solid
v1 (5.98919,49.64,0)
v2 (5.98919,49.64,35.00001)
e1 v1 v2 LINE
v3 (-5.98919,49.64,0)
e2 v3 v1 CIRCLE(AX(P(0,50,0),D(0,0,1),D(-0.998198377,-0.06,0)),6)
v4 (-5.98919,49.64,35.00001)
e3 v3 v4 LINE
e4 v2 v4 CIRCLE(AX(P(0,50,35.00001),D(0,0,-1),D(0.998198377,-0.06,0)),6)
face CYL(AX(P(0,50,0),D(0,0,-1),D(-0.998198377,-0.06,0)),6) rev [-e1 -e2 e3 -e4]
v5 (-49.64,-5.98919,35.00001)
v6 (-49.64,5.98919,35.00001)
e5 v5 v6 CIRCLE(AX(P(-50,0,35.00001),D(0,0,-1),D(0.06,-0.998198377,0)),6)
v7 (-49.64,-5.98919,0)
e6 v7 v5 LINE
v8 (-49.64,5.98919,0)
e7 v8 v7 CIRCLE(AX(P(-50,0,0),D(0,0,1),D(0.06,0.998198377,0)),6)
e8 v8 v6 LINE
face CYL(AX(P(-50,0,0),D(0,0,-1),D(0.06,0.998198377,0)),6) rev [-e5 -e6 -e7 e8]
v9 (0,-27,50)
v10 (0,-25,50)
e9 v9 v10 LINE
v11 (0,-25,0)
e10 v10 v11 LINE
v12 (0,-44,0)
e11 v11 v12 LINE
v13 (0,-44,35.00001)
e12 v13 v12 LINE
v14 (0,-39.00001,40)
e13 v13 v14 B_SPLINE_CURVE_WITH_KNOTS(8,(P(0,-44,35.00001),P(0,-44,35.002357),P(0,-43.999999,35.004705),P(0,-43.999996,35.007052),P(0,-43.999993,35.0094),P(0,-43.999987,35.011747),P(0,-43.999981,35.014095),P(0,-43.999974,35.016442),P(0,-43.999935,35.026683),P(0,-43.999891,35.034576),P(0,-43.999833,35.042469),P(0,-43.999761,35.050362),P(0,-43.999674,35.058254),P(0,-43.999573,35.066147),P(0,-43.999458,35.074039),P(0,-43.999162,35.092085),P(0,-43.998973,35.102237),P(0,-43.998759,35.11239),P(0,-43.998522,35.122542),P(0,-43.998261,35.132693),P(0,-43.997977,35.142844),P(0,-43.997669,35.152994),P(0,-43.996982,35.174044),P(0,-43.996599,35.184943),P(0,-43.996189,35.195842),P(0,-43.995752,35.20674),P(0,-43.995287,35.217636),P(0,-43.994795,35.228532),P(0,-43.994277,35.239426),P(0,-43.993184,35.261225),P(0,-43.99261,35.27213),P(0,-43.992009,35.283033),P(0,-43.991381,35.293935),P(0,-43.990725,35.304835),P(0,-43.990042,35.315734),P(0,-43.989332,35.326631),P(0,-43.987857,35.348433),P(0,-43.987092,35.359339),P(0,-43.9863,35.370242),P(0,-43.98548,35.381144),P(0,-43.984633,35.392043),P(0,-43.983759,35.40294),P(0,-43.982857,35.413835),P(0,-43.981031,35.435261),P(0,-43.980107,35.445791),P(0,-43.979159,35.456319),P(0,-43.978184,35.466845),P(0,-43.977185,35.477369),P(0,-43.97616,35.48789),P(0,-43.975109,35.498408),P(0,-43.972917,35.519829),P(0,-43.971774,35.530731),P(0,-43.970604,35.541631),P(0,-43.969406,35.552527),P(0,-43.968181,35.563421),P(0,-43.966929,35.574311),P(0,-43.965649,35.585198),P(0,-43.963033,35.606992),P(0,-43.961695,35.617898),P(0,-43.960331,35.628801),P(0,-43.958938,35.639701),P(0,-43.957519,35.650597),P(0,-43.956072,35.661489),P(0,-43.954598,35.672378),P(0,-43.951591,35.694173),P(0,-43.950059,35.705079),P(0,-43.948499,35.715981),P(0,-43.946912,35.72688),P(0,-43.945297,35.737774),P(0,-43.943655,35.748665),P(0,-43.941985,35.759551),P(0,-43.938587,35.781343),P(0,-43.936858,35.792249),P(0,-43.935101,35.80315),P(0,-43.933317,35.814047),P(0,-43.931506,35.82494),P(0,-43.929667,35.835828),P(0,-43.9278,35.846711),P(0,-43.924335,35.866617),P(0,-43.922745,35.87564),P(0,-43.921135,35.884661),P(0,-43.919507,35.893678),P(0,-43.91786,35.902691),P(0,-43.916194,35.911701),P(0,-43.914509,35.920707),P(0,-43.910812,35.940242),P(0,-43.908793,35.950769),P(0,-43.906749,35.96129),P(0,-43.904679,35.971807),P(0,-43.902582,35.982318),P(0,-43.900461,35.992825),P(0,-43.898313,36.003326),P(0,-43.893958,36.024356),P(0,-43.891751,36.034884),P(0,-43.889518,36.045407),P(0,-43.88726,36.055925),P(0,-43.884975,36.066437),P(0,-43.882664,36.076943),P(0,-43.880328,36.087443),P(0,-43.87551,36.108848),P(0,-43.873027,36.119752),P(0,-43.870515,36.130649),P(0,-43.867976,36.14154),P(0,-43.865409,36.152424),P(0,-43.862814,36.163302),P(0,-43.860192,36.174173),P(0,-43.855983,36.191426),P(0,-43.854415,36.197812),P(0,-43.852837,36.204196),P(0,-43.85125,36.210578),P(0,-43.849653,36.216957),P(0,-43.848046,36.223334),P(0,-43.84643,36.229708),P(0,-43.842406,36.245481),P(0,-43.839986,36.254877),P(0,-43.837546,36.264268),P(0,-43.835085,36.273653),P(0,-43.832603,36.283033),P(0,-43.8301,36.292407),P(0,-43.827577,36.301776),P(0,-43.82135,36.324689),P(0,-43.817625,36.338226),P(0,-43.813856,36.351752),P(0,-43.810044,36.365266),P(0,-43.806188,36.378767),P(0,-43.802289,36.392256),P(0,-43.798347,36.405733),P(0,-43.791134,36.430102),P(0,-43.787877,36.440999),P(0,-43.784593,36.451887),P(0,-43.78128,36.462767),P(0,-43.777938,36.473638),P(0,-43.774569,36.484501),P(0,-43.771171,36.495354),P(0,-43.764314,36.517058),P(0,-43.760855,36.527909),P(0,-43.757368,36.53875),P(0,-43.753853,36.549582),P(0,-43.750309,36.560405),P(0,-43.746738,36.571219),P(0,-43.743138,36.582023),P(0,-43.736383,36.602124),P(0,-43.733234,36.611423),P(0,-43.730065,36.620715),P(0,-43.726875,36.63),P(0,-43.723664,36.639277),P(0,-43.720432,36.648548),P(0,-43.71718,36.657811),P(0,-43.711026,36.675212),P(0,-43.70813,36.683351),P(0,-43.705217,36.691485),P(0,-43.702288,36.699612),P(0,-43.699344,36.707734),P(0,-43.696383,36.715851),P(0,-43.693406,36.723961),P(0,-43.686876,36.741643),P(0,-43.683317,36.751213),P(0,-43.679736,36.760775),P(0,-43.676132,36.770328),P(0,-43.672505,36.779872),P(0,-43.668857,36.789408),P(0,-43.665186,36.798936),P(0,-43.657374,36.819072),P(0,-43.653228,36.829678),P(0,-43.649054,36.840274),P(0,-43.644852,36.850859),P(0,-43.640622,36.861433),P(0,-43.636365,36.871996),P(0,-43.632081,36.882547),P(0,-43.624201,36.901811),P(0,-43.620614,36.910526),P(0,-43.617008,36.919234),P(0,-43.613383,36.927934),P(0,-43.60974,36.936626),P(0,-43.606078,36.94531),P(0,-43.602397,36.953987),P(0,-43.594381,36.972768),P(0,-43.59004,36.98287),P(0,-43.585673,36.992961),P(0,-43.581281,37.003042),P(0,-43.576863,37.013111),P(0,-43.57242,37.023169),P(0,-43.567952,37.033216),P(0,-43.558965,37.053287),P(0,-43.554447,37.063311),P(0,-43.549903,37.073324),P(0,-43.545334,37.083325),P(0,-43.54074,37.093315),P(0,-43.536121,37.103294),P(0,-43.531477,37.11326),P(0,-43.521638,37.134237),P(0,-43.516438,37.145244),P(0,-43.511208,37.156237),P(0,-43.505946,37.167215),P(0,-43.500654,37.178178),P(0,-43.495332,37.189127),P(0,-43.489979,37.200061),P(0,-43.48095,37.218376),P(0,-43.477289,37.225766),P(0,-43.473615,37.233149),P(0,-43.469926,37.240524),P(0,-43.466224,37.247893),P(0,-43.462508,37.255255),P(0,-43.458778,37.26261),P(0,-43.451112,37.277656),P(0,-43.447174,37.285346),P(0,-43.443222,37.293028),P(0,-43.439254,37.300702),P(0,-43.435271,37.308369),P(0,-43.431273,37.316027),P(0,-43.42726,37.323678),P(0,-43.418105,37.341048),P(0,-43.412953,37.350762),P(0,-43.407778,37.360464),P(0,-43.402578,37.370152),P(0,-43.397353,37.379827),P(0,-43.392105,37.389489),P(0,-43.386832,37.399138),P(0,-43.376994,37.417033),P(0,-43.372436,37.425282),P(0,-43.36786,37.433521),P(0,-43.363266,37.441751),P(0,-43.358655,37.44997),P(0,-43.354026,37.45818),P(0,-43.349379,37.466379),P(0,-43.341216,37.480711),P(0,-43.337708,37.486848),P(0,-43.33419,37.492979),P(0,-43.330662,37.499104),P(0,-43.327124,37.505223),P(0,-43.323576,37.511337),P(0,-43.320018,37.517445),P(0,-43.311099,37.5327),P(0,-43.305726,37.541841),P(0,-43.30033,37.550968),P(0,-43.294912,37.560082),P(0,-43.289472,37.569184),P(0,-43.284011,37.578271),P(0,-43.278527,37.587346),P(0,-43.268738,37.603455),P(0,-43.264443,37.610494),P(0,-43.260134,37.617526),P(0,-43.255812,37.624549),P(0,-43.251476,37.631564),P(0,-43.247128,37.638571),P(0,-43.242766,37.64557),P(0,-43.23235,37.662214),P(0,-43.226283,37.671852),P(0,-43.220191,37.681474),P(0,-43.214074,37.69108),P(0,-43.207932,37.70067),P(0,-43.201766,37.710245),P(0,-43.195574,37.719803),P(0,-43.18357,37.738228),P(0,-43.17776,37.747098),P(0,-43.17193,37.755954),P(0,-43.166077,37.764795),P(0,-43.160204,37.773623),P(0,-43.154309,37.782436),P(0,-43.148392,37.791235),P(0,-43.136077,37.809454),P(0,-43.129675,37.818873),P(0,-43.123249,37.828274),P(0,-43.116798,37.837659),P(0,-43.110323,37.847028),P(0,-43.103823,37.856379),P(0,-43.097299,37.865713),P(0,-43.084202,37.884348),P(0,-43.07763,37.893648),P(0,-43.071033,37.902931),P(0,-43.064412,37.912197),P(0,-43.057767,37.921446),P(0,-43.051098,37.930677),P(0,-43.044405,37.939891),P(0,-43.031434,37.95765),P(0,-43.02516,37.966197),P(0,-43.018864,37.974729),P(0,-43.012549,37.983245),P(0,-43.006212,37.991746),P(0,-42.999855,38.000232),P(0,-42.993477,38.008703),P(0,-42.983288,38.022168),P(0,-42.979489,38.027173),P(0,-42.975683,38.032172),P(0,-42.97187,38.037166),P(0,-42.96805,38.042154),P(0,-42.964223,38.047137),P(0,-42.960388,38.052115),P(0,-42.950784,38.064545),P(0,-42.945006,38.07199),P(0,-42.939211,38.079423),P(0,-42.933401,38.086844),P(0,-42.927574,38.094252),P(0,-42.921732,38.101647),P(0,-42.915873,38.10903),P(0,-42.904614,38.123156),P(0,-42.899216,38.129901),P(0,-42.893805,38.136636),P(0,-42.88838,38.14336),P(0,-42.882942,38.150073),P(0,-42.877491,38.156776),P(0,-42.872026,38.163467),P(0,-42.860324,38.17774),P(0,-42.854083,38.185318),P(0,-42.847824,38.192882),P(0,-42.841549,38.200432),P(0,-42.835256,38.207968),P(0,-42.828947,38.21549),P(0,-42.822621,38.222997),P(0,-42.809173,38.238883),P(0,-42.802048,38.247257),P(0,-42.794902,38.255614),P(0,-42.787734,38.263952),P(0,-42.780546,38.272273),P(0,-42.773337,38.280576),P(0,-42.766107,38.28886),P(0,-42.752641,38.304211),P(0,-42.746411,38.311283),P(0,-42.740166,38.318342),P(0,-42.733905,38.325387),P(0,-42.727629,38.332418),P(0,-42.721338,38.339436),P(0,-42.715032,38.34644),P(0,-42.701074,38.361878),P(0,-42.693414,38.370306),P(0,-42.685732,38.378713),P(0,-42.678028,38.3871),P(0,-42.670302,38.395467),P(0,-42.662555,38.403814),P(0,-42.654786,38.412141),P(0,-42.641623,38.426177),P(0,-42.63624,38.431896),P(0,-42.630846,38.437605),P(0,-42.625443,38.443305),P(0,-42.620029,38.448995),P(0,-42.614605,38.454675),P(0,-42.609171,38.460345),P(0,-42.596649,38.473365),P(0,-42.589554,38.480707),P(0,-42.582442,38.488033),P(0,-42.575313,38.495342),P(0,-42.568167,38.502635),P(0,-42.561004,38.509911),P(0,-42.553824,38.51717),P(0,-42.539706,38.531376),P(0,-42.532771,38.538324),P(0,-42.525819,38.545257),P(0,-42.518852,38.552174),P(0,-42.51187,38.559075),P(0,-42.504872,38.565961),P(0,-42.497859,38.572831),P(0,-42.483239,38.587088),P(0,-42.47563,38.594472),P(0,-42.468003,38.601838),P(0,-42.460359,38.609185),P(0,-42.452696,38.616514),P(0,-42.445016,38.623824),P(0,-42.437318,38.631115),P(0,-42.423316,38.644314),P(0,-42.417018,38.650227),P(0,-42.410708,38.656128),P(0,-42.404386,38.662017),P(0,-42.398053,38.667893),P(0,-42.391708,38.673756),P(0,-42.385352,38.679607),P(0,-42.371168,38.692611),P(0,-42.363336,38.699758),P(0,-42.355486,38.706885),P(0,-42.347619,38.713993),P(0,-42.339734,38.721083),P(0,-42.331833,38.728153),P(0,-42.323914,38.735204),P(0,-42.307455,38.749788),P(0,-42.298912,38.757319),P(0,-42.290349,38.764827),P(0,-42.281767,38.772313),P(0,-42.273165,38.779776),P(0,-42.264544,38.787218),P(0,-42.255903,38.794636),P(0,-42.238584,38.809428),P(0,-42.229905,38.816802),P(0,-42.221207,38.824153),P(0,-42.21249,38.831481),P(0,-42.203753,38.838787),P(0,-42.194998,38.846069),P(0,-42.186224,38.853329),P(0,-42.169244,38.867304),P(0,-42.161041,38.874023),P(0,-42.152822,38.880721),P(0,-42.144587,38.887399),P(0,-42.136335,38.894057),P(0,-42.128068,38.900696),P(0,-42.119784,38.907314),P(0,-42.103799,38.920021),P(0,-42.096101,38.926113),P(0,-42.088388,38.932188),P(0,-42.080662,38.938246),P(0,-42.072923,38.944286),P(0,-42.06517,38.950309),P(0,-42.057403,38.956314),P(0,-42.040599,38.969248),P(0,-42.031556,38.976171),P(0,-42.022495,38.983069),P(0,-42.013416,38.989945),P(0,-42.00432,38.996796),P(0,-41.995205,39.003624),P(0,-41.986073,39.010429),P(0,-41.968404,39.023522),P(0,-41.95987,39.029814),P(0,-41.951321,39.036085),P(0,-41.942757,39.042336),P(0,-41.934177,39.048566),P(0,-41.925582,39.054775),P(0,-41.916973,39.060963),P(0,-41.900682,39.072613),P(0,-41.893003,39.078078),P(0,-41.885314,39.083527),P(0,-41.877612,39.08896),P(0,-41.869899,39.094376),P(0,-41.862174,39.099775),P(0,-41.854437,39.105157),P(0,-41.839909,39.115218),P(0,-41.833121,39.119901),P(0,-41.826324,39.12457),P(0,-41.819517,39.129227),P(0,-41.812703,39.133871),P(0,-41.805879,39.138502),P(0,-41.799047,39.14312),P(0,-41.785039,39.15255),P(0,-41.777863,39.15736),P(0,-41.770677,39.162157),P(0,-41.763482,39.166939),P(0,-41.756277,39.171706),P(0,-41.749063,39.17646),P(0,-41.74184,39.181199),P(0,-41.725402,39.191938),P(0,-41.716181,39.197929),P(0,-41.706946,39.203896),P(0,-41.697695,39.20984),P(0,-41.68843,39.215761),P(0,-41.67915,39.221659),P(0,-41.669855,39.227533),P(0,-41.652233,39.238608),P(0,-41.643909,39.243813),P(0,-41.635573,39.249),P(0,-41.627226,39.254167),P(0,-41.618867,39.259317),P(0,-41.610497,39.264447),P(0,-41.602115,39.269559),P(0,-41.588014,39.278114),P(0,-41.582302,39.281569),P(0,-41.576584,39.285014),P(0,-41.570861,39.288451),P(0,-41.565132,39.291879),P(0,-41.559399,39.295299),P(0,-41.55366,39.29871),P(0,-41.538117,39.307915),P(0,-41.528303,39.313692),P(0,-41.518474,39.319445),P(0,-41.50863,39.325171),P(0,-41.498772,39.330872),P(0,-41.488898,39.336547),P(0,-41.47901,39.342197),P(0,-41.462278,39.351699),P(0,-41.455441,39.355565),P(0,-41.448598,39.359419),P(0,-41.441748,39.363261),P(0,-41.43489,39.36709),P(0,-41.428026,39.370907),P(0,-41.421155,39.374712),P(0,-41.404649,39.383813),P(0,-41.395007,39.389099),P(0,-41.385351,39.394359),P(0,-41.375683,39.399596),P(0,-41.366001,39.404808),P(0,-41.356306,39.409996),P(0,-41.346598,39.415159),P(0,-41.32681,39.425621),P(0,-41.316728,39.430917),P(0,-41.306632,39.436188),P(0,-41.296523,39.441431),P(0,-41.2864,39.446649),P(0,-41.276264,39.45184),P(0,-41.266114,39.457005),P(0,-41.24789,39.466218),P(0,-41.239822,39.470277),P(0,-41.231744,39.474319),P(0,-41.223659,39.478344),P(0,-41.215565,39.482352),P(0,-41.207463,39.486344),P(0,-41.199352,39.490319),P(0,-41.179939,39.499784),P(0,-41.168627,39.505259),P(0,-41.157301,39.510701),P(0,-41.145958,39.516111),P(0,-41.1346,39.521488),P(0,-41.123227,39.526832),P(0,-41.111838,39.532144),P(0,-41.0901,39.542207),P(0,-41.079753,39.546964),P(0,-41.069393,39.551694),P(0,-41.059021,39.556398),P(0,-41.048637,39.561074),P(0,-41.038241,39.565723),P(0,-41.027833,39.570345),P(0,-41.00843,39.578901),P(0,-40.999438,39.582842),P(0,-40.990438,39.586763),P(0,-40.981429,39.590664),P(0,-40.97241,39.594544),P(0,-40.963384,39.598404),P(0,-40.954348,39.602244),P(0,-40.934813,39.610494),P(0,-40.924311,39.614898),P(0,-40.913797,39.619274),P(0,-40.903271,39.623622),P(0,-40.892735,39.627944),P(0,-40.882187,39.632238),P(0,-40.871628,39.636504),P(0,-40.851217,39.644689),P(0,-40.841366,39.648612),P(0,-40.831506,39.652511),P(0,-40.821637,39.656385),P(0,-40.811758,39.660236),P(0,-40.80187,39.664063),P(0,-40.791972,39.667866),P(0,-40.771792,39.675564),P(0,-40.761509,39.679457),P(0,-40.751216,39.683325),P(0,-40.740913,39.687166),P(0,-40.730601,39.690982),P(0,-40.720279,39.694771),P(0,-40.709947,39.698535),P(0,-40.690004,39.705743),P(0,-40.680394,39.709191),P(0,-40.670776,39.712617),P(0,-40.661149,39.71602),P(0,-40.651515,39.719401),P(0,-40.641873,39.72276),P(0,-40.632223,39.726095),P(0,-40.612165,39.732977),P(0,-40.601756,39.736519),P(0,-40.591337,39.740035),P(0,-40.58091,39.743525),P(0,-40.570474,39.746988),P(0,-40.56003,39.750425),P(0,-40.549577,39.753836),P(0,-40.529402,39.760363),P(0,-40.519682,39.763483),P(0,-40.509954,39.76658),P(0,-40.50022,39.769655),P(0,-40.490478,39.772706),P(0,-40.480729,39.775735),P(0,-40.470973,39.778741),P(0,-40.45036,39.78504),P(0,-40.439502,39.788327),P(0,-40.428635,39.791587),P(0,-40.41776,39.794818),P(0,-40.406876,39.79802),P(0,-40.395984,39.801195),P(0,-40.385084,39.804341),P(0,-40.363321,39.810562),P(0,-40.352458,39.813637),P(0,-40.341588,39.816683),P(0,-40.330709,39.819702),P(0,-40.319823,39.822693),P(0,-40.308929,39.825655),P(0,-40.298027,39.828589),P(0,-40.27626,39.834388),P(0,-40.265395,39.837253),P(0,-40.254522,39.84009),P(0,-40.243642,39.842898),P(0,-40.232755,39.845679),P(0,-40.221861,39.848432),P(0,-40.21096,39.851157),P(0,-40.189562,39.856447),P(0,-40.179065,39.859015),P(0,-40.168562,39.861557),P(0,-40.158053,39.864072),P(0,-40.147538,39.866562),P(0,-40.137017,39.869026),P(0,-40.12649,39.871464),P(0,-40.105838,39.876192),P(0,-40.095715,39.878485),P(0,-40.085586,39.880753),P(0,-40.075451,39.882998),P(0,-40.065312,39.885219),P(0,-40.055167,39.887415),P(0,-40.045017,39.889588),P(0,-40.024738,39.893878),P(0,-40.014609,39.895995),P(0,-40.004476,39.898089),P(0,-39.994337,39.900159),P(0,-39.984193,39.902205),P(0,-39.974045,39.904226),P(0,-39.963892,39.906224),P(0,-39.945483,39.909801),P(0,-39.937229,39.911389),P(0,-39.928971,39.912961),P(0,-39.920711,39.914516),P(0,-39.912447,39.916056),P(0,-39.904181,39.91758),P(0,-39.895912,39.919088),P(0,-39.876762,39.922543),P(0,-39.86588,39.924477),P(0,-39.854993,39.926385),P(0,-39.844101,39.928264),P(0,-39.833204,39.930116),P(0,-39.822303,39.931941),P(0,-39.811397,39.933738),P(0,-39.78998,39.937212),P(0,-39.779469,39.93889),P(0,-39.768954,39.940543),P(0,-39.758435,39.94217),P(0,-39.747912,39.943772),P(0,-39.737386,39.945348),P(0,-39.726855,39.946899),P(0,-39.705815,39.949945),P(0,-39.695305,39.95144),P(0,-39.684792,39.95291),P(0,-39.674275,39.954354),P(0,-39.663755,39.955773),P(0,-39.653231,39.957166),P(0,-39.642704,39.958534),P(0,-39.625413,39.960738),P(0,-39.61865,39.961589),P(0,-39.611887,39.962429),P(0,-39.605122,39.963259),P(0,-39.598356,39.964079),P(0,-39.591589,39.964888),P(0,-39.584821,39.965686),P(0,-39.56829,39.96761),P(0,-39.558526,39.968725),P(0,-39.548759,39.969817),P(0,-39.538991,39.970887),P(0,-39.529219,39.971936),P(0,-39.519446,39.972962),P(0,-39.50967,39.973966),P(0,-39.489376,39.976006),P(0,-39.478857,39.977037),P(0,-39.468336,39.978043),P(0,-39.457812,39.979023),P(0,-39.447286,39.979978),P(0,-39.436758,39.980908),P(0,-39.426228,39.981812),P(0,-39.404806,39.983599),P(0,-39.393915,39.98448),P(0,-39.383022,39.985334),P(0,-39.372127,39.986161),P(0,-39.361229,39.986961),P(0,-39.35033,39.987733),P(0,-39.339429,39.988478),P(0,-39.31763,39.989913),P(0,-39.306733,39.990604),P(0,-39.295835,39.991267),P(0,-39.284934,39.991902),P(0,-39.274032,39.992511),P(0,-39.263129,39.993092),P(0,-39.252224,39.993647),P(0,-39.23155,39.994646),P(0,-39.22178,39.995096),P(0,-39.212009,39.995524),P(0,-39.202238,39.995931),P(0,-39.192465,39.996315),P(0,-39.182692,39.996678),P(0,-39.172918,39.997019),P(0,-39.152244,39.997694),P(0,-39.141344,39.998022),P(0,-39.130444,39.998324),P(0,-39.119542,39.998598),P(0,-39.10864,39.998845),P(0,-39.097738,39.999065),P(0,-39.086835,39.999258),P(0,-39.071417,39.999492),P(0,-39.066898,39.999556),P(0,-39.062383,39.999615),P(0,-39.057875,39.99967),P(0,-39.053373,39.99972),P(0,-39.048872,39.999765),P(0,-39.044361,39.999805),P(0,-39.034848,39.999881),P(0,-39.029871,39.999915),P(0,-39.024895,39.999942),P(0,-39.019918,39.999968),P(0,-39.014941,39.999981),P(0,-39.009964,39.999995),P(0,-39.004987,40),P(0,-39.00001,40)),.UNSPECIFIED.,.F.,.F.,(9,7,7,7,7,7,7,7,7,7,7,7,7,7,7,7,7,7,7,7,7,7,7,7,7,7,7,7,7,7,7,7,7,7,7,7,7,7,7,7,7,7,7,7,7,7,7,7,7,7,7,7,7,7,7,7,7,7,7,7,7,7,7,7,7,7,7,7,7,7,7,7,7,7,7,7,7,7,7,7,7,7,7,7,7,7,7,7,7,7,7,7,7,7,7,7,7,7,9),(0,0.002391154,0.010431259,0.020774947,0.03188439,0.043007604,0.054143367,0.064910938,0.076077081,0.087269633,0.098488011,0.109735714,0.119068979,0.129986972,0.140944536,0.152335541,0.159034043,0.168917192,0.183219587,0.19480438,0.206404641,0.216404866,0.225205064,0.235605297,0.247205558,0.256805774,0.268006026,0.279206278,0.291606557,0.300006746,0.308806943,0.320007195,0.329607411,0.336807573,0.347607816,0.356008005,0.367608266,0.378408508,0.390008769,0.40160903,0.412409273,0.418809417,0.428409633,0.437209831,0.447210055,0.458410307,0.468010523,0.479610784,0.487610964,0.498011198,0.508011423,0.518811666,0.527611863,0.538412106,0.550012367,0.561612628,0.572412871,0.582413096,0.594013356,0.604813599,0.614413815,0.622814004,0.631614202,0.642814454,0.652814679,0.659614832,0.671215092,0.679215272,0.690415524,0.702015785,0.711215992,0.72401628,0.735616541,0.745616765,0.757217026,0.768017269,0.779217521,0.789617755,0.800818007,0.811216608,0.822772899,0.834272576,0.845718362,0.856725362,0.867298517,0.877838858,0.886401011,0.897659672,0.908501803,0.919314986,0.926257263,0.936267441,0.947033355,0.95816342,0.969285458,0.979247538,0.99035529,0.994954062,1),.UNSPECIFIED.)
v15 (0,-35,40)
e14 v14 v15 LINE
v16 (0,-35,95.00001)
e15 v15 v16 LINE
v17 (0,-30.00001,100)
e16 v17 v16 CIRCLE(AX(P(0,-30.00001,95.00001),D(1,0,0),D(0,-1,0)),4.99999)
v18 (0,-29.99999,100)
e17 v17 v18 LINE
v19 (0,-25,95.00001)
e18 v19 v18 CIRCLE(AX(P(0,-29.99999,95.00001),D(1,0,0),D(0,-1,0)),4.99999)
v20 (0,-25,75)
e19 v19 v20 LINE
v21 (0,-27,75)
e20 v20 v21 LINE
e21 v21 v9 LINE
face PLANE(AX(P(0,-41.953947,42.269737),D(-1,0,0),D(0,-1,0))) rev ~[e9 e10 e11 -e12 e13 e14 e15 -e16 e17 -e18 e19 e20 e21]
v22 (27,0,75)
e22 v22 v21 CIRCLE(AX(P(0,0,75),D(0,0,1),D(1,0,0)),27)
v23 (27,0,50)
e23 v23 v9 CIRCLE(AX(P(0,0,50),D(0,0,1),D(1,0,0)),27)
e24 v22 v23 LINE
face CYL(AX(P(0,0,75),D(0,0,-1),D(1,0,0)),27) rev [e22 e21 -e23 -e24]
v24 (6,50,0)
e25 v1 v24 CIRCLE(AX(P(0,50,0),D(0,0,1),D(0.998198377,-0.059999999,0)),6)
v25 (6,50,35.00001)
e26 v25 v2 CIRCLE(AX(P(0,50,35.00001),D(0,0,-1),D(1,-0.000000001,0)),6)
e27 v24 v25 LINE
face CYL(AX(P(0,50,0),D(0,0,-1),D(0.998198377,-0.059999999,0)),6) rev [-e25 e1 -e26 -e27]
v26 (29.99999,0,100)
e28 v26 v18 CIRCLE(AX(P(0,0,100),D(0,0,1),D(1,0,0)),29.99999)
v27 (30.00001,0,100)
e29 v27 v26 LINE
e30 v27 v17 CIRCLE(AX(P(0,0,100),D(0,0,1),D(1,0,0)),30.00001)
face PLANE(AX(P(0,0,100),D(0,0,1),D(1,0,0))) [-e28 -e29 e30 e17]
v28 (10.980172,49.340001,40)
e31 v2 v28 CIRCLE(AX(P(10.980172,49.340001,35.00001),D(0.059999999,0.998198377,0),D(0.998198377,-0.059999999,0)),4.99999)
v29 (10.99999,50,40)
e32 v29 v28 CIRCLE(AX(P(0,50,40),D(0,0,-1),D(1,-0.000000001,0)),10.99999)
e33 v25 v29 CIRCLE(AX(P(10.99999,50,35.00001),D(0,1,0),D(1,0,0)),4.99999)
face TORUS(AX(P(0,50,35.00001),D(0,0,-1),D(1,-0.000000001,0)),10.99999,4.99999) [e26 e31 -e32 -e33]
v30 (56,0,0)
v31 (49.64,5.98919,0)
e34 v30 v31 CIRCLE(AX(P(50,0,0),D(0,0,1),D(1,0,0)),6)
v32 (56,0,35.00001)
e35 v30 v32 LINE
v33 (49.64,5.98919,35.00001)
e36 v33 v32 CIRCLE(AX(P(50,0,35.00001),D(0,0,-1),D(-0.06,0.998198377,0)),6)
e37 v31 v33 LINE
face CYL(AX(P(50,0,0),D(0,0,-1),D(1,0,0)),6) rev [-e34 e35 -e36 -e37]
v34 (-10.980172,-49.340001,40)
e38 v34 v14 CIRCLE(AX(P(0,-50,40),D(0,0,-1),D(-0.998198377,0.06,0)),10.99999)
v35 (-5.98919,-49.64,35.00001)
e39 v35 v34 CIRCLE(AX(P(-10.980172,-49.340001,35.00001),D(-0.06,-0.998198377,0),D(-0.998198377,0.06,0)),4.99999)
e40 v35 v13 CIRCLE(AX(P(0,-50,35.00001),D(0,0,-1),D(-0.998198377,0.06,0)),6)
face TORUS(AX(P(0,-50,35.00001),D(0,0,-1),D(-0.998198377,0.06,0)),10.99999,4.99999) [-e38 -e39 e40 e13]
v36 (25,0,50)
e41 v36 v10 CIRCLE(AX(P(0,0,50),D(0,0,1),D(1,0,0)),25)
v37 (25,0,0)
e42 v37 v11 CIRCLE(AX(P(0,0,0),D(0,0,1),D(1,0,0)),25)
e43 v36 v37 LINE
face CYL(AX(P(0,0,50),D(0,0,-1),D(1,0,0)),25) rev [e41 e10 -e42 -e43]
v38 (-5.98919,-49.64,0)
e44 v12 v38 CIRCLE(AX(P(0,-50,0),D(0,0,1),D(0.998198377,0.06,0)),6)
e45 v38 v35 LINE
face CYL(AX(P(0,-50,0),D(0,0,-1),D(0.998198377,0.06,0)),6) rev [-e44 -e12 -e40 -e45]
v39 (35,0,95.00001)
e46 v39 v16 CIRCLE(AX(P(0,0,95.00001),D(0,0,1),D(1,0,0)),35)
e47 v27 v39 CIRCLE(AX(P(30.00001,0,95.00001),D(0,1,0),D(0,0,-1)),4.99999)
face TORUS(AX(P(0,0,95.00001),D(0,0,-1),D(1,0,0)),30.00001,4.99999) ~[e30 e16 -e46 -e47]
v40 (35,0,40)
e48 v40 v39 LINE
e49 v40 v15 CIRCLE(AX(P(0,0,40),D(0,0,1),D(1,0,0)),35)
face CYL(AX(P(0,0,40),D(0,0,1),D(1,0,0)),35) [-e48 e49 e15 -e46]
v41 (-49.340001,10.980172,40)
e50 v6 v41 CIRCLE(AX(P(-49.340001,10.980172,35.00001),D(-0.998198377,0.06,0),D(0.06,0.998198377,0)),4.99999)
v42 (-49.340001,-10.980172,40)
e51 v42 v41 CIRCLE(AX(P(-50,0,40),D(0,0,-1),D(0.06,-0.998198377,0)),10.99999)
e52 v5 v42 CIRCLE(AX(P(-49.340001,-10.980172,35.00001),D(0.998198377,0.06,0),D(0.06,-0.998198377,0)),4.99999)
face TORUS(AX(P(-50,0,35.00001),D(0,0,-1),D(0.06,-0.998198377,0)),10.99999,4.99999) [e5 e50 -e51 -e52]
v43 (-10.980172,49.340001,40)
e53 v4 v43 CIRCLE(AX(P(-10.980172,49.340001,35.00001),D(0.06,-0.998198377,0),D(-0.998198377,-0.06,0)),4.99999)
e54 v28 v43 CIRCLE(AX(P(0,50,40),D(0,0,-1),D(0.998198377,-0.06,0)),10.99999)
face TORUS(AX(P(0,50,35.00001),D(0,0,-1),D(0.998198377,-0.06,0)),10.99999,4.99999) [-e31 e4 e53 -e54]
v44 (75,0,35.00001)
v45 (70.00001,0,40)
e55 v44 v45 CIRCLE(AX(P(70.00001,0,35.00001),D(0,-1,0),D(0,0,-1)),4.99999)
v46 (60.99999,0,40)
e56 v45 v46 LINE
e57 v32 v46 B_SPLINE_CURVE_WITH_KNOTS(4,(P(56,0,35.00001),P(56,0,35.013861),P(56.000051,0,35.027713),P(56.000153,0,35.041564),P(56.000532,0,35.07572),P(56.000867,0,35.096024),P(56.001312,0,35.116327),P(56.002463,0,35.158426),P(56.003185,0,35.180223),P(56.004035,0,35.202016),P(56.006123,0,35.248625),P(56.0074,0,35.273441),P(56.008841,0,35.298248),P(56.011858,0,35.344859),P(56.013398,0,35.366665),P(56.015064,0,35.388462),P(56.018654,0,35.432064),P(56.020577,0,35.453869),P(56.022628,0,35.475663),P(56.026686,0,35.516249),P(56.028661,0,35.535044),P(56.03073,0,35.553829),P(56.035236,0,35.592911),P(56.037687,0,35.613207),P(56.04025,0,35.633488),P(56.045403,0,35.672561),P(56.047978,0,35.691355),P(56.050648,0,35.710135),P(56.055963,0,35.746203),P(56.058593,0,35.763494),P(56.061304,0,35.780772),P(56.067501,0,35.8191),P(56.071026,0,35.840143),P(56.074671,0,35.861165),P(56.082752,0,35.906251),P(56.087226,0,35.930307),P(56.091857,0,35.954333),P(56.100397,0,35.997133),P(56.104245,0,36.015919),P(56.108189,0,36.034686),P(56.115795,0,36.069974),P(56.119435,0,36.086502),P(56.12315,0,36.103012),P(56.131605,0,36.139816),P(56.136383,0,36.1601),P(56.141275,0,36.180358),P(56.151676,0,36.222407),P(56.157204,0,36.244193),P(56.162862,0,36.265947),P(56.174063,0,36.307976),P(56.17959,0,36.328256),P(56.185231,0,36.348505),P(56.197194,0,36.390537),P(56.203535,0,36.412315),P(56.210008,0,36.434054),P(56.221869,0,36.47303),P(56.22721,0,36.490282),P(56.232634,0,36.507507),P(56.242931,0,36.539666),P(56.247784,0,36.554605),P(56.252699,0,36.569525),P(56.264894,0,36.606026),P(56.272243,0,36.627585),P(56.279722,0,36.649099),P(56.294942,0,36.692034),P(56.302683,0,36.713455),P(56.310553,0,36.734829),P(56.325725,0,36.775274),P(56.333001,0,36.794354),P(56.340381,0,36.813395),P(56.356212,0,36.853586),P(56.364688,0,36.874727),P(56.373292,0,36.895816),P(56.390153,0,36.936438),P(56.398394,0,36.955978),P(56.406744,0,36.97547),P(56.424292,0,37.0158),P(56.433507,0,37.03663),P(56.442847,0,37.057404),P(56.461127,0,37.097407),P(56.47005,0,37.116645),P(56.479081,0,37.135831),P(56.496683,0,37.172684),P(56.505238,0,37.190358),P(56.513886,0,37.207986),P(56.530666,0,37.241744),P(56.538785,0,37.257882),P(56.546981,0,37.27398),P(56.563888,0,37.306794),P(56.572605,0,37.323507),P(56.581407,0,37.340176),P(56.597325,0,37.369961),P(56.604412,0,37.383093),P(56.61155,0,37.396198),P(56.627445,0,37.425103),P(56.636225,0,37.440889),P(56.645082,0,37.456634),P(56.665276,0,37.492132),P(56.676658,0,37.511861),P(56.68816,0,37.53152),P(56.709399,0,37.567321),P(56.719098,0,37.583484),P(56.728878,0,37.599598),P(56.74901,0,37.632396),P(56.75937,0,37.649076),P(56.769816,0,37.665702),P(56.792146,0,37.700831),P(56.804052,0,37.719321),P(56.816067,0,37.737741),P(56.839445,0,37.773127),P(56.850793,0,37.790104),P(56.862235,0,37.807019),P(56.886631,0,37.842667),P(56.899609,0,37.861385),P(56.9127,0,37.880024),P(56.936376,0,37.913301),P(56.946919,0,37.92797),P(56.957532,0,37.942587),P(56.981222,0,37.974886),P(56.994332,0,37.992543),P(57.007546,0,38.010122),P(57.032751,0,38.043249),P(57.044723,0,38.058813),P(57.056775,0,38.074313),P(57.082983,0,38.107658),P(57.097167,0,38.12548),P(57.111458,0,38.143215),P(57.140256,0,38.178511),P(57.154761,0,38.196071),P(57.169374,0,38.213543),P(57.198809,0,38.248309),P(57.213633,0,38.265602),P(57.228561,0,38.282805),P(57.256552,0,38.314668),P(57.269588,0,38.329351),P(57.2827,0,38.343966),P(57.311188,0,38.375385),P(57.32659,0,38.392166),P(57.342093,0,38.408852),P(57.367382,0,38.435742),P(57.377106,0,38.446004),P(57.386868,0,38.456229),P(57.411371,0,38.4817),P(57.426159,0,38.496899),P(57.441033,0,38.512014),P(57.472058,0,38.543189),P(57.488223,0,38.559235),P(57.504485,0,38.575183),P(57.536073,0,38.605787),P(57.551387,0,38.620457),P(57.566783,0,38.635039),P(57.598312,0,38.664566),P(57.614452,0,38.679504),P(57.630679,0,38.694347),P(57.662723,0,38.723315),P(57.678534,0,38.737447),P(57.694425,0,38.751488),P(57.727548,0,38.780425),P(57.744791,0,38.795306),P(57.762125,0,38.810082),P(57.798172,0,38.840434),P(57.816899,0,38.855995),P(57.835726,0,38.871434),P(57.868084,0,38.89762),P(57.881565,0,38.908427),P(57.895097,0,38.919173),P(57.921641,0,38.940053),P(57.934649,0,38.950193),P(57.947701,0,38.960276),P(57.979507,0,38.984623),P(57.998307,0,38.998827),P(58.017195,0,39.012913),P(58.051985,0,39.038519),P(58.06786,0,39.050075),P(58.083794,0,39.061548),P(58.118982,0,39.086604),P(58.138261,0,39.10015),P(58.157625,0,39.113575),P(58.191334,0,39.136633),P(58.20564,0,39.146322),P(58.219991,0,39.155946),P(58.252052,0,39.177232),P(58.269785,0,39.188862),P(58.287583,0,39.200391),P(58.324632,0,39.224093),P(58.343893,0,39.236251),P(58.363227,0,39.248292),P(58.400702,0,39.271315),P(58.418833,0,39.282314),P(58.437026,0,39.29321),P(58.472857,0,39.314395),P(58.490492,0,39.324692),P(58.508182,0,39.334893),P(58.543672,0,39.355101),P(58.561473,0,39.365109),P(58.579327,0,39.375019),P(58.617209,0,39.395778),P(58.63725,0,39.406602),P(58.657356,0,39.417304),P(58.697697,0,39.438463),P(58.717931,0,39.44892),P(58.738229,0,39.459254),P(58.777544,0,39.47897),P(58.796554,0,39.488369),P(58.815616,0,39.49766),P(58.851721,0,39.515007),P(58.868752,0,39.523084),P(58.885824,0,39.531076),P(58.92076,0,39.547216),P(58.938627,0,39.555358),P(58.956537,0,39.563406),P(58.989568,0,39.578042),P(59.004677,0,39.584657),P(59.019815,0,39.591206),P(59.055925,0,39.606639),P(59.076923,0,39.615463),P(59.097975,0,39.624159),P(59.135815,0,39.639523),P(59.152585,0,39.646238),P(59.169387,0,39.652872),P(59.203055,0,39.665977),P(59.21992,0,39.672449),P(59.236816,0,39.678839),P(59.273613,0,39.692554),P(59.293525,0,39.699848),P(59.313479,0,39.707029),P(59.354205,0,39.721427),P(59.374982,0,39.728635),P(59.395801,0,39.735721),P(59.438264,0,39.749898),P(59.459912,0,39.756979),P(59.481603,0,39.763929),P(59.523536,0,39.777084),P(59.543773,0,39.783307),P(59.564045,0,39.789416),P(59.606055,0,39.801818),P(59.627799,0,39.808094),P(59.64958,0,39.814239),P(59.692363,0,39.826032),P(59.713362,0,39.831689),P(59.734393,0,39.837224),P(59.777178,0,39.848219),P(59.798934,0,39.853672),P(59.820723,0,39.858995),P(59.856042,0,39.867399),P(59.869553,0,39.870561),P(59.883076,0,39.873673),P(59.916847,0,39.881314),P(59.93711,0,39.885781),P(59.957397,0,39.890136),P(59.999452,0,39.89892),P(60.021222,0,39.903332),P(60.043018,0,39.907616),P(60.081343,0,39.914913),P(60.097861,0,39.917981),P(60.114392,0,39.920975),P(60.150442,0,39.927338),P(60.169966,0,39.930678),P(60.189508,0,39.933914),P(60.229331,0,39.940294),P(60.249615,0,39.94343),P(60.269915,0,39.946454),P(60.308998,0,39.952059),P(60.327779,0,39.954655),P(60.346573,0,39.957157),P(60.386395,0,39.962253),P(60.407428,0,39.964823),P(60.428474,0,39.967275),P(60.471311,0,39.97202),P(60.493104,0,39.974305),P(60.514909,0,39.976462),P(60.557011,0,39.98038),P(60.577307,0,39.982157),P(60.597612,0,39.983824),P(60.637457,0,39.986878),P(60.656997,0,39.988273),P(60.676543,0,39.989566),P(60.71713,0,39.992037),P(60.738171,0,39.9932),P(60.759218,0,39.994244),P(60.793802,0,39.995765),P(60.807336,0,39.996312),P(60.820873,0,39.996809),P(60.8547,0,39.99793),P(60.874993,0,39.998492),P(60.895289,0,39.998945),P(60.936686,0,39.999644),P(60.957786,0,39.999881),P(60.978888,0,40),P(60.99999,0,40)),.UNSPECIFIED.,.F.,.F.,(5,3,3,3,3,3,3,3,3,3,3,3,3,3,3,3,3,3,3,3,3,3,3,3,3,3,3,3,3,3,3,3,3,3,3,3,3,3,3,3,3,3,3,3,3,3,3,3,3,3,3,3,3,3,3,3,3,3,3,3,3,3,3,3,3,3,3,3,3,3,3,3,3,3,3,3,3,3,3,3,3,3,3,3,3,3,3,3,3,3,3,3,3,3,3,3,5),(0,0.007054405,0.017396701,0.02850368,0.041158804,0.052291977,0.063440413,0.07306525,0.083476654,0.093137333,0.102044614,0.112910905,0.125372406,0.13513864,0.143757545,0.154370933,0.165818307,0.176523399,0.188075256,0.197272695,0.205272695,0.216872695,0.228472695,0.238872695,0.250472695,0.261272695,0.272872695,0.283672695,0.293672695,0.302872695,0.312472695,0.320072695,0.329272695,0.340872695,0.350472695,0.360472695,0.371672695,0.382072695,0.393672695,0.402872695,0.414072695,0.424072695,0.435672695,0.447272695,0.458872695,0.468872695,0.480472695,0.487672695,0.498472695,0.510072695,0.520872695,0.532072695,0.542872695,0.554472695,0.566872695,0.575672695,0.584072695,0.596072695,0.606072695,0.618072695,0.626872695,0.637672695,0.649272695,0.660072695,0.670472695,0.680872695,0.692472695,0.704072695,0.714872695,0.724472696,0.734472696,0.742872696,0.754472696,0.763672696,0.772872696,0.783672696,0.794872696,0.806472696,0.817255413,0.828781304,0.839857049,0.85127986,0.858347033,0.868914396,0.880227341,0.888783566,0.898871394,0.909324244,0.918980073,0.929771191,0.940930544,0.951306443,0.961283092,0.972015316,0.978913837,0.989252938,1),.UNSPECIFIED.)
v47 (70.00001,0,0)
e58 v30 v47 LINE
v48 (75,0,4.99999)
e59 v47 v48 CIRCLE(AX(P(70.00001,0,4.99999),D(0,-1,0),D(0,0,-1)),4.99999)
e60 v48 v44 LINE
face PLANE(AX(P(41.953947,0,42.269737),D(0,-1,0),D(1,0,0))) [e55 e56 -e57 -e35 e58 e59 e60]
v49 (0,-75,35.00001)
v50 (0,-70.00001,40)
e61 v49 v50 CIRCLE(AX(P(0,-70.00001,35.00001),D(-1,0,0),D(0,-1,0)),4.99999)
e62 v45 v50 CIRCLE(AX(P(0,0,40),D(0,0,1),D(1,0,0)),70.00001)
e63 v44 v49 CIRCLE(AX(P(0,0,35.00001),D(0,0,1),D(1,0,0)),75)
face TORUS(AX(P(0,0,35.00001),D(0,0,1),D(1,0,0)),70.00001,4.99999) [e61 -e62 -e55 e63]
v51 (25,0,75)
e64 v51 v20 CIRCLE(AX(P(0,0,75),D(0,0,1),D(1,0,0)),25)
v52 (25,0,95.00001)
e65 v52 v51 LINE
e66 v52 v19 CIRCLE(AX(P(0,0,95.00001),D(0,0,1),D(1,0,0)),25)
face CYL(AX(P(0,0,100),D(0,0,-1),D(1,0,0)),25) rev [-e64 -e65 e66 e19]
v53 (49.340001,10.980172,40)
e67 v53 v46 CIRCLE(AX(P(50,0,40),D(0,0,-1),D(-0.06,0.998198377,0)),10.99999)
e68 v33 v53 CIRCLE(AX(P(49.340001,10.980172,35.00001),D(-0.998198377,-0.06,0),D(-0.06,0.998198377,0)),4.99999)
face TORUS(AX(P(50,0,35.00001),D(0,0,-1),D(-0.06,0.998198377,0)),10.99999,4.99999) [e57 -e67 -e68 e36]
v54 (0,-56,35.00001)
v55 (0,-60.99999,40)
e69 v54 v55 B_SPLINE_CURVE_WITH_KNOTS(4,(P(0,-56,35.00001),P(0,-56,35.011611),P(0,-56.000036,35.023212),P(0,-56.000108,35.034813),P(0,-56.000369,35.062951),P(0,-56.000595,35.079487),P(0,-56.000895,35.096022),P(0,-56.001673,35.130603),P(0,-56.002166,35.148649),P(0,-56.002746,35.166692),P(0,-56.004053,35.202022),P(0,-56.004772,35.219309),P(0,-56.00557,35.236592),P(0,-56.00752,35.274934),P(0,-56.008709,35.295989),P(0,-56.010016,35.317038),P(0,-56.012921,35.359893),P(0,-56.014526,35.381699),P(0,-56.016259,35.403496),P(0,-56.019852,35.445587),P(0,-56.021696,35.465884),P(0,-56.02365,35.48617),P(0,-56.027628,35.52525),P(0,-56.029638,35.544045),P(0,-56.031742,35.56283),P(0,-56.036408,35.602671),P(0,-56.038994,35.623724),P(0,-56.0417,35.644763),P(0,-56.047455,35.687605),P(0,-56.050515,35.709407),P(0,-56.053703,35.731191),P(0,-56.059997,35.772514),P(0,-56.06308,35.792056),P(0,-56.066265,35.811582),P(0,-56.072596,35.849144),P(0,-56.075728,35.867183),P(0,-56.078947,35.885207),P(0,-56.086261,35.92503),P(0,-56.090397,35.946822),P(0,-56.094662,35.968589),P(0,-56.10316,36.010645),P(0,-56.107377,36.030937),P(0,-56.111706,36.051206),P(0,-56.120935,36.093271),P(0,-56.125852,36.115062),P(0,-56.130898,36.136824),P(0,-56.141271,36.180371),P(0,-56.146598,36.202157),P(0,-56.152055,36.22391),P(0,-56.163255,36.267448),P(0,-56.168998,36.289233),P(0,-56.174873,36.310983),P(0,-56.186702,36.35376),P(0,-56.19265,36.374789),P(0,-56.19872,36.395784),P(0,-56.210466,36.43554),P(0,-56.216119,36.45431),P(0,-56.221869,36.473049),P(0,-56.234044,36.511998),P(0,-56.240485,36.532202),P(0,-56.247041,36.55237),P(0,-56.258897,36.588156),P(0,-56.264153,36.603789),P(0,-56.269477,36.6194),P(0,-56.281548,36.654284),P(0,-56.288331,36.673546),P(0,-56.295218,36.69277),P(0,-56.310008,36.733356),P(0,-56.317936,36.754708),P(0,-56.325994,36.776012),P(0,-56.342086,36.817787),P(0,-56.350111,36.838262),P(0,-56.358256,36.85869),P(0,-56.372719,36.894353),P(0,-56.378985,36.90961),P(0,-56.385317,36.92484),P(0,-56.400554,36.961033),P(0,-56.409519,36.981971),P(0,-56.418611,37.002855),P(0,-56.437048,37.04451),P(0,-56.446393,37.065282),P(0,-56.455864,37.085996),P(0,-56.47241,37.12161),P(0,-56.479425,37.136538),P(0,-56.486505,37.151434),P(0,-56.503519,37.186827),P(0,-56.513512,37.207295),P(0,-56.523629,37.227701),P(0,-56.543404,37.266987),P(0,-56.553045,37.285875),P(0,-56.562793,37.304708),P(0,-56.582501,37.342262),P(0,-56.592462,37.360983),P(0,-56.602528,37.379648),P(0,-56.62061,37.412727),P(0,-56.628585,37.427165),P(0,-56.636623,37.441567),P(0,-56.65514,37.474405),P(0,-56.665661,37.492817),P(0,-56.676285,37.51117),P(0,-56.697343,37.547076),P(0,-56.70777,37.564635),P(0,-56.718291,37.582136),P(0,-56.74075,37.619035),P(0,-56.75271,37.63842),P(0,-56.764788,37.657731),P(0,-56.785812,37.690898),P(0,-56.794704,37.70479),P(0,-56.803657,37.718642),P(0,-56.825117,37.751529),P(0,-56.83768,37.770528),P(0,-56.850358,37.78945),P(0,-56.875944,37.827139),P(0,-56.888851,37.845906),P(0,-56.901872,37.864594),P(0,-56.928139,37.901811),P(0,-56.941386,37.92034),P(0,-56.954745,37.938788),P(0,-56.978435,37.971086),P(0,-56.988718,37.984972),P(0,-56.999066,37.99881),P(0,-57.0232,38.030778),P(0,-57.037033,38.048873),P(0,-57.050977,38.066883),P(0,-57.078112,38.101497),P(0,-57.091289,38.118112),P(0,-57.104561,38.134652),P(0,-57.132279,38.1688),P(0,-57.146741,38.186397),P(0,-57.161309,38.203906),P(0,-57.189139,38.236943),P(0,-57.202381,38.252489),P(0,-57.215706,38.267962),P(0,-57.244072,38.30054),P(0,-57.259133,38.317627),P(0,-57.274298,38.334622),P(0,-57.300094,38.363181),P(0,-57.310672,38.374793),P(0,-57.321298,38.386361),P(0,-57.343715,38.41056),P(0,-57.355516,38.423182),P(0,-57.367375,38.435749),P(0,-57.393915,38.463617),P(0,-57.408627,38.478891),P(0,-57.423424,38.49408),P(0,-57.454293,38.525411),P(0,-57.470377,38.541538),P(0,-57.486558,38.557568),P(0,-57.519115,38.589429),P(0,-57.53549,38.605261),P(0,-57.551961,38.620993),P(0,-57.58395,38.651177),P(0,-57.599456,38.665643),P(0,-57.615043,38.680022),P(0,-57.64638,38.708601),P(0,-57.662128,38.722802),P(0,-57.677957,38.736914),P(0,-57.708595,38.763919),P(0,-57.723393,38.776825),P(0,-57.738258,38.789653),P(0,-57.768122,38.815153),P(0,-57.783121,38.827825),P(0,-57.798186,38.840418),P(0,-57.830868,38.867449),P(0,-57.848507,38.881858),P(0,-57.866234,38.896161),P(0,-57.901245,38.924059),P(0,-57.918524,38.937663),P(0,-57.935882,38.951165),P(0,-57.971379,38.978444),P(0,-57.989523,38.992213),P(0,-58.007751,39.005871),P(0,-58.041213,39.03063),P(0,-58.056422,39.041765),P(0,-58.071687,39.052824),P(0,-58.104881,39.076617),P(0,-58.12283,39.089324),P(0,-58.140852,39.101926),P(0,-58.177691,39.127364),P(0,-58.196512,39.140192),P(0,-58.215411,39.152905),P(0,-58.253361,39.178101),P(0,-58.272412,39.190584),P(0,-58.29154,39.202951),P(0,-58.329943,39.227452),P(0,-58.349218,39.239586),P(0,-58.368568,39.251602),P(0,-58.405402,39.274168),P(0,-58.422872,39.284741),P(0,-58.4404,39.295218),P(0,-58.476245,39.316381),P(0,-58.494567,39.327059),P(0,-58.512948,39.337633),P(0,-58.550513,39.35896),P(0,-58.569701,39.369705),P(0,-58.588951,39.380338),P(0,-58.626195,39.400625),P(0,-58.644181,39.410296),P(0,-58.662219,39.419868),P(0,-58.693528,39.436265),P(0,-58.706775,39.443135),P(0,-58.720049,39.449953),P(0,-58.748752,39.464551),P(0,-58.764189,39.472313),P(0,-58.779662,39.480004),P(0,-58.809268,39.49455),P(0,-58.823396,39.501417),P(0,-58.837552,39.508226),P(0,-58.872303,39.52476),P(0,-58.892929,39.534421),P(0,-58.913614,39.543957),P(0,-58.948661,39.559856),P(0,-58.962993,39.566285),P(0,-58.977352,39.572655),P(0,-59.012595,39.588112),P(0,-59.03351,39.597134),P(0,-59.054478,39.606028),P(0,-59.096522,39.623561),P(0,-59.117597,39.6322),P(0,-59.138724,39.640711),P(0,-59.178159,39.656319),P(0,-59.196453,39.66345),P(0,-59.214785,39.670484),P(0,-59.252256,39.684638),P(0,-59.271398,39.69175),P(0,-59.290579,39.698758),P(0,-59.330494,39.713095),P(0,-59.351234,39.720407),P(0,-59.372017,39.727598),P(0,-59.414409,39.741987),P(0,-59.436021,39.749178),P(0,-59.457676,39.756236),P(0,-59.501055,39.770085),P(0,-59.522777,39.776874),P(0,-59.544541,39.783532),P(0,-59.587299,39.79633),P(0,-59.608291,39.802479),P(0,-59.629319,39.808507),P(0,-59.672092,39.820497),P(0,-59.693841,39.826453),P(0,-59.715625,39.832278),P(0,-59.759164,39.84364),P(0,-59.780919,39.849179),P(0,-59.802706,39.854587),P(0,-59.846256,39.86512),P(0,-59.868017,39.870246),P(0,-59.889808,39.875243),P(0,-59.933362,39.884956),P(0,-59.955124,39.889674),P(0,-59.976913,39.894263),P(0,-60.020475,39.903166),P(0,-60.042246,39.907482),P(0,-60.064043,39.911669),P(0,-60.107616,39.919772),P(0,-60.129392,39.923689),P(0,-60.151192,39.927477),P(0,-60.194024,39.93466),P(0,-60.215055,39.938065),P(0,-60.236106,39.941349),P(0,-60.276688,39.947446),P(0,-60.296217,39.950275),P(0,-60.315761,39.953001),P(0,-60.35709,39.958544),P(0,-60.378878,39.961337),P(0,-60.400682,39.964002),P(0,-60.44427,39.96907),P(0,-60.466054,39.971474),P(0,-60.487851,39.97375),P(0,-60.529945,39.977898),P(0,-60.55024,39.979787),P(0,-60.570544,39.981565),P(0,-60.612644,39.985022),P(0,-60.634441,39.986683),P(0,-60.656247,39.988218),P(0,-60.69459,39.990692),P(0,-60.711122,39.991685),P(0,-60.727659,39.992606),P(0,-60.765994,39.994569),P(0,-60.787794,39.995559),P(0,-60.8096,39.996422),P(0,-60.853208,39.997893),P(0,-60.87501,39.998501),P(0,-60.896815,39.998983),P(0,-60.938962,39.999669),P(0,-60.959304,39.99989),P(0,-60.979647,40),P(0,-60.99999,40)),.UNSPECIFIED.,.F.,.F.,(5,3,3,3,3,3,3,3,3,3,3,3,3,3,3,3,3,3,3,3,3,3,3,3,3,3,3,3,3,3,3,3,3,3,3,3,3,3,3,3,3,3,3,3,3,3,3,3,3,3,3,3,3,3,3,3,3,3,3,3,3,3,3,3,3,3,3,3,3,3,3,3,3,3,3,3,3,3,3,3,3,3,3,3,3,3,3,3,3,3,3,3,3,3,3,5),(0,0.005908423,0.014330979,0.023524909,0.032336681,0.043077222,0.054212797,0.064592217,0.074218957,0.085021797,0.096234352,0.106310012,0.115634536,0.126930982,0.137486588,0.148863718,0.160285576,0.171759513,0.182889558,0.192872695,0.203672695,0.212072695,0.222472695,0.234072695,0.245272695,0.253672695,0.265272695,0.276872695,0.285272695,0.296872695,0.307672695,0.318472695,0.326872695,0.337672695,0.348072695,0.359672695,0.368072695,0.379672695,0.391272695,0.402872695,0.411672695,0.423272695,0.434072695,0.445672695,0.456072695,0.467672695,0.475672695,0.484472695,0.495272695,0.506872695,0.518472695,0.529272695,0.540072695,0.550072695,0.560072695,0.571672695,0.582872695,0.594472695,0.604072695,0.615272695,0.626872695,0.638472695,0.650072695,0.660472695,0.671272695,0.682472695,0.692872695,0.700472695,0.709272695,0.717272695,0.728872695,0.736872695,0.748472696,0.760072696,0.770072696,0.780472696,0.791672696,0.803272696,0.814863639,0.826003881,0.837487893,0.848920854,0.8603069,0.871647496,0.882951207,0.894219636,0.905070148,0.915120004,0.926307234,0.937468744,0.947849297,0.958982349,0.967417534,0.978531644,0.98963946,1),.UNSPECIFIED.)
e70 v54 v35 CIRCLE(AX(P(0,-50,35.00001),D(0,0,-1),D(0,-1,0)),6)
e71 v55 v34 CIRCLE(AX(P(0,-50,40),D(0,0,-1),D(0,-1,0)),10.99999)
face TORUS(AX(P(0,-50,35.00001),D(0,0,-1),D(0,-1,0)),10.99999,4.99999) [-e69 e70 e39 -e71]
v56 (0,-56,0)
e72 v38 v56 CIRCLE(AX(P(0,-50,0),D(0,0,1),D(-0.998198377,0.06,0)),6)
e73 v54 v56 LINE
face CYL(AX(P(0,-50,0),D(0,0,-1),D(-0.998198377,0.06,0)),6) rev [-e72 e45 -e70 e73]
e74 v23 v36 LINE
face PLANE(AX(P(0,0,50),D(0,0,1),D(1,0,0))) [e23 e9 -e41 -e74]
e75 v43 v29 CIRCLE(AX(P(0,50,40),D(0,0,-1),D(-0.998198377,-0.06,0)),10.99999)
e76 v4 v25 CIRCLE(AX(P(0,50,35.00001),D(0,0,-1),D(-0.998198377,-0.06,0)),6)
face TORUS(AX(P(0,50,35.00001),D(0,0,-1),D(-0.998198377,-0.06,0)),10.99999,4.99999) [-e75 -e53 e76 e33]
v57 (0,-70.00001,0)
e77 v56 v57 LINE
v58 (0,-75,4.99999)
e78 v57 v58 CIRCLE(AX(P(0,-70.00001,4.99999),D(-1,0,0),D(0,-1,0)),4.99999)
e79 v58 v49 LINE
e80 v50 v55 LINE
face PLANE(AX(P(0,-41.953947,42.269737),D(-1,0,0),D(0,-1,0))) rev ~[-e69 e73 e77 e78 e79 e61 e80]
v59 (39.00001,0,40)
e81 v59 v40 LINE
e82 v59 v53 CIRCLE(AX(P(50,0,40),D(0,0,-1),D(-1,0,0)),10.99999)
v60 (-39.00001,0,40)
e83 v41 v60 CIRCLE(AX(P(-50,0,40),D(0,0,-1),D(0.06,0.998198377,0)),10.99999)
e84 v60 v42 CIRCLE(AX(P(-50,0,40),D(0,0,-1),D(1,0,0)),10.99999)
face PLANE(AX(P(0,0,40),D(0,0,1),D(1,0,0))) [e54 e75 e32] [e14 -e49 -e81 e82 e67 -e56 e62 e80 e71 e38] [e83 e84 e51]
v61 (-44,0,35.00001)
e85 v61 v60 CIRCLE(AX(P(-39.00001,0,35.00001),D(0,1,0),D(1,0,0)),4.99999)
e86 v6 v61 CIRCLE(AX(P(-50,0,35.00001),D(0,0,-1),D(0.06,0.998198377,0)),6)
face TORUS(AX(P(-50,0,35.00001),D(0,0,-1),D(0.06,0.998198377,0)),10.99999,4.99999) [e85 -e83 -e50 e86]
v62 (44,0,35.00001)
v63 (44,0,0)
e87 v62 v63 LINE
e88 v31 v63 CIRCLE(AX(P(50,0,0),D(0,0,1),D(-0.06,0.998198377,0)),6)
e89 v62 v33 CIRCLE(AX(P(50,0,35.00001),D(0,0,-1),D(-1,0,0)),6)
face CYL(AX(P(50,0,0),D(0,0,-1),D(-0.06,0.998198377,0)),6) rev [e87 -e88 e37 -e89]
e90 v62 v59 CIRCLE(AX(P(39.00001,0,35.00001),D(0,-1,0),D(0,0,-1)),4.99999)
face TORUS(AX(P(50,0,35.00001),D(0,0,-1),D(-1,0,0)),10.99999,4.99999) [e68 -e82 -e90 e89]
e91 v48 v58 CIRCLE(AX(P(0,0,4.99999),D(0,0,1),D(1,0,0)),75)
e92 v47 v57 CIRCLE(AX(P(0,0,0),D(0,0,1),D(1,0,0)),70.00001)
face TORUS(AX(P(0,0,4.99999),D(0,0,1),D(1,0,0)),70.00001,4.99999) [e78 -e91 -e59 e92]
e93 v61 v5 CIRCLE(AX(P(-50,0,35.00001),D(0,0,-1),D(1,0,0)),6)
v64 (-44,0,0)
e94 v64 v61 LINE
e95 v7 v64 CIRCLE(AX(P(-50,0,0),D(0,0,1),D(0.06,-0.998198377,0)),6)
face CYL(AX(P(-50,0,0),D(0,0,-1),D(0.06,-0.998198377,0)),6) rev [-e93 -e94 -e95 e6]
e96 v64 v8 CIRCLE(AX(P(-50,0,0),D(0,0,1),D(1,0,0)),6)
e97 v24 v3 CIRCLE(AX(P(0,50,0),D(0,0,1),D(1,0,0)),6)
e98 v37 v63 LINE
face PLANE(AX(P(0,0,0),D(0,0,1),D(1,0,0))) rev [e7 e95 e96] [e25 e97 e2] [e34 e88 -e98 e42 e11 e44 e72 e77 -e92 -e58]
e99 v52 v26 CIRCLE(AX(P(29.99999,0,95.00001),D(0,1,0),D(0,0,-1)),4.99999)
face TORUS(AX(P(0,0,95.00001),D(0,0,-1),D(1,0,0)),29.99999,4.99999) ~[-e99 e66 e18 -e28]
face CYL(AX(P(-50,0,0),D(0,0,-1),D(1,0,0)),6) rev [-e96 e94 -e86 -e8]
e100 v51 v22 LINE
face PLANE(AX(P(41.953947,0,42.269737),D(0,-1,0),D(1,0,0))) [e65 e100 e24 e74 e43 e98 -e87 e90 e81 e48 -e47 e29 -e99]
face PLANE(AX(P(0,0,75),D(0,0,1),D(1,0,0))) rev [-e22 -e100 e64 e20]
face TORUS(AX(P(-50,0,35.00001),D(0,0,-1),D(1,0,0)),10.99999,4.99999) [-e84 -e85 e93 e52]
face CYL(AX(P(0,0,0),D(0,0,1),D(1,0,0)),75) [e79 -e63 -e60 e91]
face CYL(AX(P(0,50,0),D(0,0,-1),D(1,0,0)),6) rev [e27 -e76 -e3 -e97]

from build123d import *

# Parameters (mm, degrees)
F1_ANGLE = 270
F3_DEPTH = 1000
F4_R     = 4.99999


# Not quite as in the source:
# - a fillet or chamfer is up to 0.001 mm smaller than in the source, because OpenCascade refuses the exact size


with BuildPart() as f1:
    # F0 (on Front) → F1 (revolve)
    with BuildSketch(Plane.XZ):
        Polygon((25, 50), (25, 0), (35, 0), (75, 0), (75, 40), (35, 40), (35, 100), (25, 100), (25, 75), (27, 75), (27, 50), align=None)
    revolve(axis=Axis((0, 0, 36.062438041), (0, 0, 1)), revolution_arc=F1_ANGLE)

    # F2 (on Top) → F3 (cut)
    with BuildSketch(Plane.XY):
        with BuildLine():
            ThreePointArc((-44, 0), (-45.6319340664, 4.1133927602), (-49.64, 5.9891902625))
            ThreePointArc((-49.64, 5.9891902625), (-50, 0), (-49.64, -5.9891902625))
            ThreePointArc((-49.64, -5.9891902625), (-45.6319340664, -4.1133927602), (-44, 0))
        make_face()
        with BuildLine():
            ThreePointArc((-49.64, -5.9891902625), (-50, 0), (-49.64, 5.9891902625))
            ThreePointArc((-49.64, 5.9891902625), (-56, 0), (-49.64, -5.9891902625))
        make_face()
        with BuildLine():
            ThreePointArc((-5.9891902625, 49.64), (0, 44), (5.9891902625, 49.64))
            ThreePointArc((5.9891902625, 49.64), (0, 50), (-5.9891902625, 49.64))
        make_face()
        with BuildLine():
            ThreePointArc((-5.9891902625, 49.64), (0, 50), (5.9891902625, 49.64))
            ThreePointArc((5.9891902625, 49.64), (5.9972969567, 49.8199188722), (6, 50))
            ThreePointArc((6, 50), (-0.1800811278, 55.9972969567), (-5.9891902625, 49.64))
        make_face()
        with BuildLine():
            ThreePointArc((49.64, -5.9891902625), (49.9099188539, -3), (50, 0))
            ThreePointArc((50, 0), (49.9099188539, 3), (49.64, 5.9891902625))
            ThreePointArc((49.64, 5.9891902625), (44, 0), (49.64, -5.9891902625))
        make_face()
        with BuildLine():
            ThreePointArc((49.64, 5.9891902625), (49.9099188539, 3), (50, 0))
            ThreePointArc((50, 0), (49.9099188539, -3), (49.64, -5.9891902625))
            ThreePointArc((49.64, -5.9891902625), (54.1133927602, -4.3680659336), (56, 0))
            ThreePointArc((56, 0), (54.1133927602, 4.3680659336), (49.64, 5.9891902625))
        make_face()
        with BuildLine():
            ThreePointArc((-5.9891902625, -49.64), (0, -50), (5.9891902625, -49.64))
            ThreePointArc((5.9891902625, -49.64), (0, -44), (-5.9891902625, -49.64))
        make_face()
        with BuildLine():
            ThreePointArc((6, -50), (5.9972969567, -49.8199188722), (5.9891902625, -49.64))
            ThreePointArc((5.9891902625, -49.64), (0, -50), (-5.9891902625, -49.64))
            ThreePointArc((-5.9891902625, -49.64), (-0.1800811278, -55.9972969567), (6, -50))
        make_face()
    extrude(amount=F3_DEPTH, mode=Mode.SUBTRACT)

    # F4 (radius 5 in the source; OpenCascade refuses exactly that, so slightly less here)
    f4_edges = [f1.edges().sort_by_distance(p)[0] for p in [
        (-24.748737, 24.748737, 100),
        (-17.67767, 17.67767, 100),
        (-53.033009, 53.033009, 40),
        (-56, 0, 40),
        (-6, -50, 40),
        (50, 6, 40),
        (-5.98919, 50.36, 40),
        (-53.033009, 53.033009, 0),
    ]]
    fillet(f4_edges, radius=F4_R)


solid = f1.part
